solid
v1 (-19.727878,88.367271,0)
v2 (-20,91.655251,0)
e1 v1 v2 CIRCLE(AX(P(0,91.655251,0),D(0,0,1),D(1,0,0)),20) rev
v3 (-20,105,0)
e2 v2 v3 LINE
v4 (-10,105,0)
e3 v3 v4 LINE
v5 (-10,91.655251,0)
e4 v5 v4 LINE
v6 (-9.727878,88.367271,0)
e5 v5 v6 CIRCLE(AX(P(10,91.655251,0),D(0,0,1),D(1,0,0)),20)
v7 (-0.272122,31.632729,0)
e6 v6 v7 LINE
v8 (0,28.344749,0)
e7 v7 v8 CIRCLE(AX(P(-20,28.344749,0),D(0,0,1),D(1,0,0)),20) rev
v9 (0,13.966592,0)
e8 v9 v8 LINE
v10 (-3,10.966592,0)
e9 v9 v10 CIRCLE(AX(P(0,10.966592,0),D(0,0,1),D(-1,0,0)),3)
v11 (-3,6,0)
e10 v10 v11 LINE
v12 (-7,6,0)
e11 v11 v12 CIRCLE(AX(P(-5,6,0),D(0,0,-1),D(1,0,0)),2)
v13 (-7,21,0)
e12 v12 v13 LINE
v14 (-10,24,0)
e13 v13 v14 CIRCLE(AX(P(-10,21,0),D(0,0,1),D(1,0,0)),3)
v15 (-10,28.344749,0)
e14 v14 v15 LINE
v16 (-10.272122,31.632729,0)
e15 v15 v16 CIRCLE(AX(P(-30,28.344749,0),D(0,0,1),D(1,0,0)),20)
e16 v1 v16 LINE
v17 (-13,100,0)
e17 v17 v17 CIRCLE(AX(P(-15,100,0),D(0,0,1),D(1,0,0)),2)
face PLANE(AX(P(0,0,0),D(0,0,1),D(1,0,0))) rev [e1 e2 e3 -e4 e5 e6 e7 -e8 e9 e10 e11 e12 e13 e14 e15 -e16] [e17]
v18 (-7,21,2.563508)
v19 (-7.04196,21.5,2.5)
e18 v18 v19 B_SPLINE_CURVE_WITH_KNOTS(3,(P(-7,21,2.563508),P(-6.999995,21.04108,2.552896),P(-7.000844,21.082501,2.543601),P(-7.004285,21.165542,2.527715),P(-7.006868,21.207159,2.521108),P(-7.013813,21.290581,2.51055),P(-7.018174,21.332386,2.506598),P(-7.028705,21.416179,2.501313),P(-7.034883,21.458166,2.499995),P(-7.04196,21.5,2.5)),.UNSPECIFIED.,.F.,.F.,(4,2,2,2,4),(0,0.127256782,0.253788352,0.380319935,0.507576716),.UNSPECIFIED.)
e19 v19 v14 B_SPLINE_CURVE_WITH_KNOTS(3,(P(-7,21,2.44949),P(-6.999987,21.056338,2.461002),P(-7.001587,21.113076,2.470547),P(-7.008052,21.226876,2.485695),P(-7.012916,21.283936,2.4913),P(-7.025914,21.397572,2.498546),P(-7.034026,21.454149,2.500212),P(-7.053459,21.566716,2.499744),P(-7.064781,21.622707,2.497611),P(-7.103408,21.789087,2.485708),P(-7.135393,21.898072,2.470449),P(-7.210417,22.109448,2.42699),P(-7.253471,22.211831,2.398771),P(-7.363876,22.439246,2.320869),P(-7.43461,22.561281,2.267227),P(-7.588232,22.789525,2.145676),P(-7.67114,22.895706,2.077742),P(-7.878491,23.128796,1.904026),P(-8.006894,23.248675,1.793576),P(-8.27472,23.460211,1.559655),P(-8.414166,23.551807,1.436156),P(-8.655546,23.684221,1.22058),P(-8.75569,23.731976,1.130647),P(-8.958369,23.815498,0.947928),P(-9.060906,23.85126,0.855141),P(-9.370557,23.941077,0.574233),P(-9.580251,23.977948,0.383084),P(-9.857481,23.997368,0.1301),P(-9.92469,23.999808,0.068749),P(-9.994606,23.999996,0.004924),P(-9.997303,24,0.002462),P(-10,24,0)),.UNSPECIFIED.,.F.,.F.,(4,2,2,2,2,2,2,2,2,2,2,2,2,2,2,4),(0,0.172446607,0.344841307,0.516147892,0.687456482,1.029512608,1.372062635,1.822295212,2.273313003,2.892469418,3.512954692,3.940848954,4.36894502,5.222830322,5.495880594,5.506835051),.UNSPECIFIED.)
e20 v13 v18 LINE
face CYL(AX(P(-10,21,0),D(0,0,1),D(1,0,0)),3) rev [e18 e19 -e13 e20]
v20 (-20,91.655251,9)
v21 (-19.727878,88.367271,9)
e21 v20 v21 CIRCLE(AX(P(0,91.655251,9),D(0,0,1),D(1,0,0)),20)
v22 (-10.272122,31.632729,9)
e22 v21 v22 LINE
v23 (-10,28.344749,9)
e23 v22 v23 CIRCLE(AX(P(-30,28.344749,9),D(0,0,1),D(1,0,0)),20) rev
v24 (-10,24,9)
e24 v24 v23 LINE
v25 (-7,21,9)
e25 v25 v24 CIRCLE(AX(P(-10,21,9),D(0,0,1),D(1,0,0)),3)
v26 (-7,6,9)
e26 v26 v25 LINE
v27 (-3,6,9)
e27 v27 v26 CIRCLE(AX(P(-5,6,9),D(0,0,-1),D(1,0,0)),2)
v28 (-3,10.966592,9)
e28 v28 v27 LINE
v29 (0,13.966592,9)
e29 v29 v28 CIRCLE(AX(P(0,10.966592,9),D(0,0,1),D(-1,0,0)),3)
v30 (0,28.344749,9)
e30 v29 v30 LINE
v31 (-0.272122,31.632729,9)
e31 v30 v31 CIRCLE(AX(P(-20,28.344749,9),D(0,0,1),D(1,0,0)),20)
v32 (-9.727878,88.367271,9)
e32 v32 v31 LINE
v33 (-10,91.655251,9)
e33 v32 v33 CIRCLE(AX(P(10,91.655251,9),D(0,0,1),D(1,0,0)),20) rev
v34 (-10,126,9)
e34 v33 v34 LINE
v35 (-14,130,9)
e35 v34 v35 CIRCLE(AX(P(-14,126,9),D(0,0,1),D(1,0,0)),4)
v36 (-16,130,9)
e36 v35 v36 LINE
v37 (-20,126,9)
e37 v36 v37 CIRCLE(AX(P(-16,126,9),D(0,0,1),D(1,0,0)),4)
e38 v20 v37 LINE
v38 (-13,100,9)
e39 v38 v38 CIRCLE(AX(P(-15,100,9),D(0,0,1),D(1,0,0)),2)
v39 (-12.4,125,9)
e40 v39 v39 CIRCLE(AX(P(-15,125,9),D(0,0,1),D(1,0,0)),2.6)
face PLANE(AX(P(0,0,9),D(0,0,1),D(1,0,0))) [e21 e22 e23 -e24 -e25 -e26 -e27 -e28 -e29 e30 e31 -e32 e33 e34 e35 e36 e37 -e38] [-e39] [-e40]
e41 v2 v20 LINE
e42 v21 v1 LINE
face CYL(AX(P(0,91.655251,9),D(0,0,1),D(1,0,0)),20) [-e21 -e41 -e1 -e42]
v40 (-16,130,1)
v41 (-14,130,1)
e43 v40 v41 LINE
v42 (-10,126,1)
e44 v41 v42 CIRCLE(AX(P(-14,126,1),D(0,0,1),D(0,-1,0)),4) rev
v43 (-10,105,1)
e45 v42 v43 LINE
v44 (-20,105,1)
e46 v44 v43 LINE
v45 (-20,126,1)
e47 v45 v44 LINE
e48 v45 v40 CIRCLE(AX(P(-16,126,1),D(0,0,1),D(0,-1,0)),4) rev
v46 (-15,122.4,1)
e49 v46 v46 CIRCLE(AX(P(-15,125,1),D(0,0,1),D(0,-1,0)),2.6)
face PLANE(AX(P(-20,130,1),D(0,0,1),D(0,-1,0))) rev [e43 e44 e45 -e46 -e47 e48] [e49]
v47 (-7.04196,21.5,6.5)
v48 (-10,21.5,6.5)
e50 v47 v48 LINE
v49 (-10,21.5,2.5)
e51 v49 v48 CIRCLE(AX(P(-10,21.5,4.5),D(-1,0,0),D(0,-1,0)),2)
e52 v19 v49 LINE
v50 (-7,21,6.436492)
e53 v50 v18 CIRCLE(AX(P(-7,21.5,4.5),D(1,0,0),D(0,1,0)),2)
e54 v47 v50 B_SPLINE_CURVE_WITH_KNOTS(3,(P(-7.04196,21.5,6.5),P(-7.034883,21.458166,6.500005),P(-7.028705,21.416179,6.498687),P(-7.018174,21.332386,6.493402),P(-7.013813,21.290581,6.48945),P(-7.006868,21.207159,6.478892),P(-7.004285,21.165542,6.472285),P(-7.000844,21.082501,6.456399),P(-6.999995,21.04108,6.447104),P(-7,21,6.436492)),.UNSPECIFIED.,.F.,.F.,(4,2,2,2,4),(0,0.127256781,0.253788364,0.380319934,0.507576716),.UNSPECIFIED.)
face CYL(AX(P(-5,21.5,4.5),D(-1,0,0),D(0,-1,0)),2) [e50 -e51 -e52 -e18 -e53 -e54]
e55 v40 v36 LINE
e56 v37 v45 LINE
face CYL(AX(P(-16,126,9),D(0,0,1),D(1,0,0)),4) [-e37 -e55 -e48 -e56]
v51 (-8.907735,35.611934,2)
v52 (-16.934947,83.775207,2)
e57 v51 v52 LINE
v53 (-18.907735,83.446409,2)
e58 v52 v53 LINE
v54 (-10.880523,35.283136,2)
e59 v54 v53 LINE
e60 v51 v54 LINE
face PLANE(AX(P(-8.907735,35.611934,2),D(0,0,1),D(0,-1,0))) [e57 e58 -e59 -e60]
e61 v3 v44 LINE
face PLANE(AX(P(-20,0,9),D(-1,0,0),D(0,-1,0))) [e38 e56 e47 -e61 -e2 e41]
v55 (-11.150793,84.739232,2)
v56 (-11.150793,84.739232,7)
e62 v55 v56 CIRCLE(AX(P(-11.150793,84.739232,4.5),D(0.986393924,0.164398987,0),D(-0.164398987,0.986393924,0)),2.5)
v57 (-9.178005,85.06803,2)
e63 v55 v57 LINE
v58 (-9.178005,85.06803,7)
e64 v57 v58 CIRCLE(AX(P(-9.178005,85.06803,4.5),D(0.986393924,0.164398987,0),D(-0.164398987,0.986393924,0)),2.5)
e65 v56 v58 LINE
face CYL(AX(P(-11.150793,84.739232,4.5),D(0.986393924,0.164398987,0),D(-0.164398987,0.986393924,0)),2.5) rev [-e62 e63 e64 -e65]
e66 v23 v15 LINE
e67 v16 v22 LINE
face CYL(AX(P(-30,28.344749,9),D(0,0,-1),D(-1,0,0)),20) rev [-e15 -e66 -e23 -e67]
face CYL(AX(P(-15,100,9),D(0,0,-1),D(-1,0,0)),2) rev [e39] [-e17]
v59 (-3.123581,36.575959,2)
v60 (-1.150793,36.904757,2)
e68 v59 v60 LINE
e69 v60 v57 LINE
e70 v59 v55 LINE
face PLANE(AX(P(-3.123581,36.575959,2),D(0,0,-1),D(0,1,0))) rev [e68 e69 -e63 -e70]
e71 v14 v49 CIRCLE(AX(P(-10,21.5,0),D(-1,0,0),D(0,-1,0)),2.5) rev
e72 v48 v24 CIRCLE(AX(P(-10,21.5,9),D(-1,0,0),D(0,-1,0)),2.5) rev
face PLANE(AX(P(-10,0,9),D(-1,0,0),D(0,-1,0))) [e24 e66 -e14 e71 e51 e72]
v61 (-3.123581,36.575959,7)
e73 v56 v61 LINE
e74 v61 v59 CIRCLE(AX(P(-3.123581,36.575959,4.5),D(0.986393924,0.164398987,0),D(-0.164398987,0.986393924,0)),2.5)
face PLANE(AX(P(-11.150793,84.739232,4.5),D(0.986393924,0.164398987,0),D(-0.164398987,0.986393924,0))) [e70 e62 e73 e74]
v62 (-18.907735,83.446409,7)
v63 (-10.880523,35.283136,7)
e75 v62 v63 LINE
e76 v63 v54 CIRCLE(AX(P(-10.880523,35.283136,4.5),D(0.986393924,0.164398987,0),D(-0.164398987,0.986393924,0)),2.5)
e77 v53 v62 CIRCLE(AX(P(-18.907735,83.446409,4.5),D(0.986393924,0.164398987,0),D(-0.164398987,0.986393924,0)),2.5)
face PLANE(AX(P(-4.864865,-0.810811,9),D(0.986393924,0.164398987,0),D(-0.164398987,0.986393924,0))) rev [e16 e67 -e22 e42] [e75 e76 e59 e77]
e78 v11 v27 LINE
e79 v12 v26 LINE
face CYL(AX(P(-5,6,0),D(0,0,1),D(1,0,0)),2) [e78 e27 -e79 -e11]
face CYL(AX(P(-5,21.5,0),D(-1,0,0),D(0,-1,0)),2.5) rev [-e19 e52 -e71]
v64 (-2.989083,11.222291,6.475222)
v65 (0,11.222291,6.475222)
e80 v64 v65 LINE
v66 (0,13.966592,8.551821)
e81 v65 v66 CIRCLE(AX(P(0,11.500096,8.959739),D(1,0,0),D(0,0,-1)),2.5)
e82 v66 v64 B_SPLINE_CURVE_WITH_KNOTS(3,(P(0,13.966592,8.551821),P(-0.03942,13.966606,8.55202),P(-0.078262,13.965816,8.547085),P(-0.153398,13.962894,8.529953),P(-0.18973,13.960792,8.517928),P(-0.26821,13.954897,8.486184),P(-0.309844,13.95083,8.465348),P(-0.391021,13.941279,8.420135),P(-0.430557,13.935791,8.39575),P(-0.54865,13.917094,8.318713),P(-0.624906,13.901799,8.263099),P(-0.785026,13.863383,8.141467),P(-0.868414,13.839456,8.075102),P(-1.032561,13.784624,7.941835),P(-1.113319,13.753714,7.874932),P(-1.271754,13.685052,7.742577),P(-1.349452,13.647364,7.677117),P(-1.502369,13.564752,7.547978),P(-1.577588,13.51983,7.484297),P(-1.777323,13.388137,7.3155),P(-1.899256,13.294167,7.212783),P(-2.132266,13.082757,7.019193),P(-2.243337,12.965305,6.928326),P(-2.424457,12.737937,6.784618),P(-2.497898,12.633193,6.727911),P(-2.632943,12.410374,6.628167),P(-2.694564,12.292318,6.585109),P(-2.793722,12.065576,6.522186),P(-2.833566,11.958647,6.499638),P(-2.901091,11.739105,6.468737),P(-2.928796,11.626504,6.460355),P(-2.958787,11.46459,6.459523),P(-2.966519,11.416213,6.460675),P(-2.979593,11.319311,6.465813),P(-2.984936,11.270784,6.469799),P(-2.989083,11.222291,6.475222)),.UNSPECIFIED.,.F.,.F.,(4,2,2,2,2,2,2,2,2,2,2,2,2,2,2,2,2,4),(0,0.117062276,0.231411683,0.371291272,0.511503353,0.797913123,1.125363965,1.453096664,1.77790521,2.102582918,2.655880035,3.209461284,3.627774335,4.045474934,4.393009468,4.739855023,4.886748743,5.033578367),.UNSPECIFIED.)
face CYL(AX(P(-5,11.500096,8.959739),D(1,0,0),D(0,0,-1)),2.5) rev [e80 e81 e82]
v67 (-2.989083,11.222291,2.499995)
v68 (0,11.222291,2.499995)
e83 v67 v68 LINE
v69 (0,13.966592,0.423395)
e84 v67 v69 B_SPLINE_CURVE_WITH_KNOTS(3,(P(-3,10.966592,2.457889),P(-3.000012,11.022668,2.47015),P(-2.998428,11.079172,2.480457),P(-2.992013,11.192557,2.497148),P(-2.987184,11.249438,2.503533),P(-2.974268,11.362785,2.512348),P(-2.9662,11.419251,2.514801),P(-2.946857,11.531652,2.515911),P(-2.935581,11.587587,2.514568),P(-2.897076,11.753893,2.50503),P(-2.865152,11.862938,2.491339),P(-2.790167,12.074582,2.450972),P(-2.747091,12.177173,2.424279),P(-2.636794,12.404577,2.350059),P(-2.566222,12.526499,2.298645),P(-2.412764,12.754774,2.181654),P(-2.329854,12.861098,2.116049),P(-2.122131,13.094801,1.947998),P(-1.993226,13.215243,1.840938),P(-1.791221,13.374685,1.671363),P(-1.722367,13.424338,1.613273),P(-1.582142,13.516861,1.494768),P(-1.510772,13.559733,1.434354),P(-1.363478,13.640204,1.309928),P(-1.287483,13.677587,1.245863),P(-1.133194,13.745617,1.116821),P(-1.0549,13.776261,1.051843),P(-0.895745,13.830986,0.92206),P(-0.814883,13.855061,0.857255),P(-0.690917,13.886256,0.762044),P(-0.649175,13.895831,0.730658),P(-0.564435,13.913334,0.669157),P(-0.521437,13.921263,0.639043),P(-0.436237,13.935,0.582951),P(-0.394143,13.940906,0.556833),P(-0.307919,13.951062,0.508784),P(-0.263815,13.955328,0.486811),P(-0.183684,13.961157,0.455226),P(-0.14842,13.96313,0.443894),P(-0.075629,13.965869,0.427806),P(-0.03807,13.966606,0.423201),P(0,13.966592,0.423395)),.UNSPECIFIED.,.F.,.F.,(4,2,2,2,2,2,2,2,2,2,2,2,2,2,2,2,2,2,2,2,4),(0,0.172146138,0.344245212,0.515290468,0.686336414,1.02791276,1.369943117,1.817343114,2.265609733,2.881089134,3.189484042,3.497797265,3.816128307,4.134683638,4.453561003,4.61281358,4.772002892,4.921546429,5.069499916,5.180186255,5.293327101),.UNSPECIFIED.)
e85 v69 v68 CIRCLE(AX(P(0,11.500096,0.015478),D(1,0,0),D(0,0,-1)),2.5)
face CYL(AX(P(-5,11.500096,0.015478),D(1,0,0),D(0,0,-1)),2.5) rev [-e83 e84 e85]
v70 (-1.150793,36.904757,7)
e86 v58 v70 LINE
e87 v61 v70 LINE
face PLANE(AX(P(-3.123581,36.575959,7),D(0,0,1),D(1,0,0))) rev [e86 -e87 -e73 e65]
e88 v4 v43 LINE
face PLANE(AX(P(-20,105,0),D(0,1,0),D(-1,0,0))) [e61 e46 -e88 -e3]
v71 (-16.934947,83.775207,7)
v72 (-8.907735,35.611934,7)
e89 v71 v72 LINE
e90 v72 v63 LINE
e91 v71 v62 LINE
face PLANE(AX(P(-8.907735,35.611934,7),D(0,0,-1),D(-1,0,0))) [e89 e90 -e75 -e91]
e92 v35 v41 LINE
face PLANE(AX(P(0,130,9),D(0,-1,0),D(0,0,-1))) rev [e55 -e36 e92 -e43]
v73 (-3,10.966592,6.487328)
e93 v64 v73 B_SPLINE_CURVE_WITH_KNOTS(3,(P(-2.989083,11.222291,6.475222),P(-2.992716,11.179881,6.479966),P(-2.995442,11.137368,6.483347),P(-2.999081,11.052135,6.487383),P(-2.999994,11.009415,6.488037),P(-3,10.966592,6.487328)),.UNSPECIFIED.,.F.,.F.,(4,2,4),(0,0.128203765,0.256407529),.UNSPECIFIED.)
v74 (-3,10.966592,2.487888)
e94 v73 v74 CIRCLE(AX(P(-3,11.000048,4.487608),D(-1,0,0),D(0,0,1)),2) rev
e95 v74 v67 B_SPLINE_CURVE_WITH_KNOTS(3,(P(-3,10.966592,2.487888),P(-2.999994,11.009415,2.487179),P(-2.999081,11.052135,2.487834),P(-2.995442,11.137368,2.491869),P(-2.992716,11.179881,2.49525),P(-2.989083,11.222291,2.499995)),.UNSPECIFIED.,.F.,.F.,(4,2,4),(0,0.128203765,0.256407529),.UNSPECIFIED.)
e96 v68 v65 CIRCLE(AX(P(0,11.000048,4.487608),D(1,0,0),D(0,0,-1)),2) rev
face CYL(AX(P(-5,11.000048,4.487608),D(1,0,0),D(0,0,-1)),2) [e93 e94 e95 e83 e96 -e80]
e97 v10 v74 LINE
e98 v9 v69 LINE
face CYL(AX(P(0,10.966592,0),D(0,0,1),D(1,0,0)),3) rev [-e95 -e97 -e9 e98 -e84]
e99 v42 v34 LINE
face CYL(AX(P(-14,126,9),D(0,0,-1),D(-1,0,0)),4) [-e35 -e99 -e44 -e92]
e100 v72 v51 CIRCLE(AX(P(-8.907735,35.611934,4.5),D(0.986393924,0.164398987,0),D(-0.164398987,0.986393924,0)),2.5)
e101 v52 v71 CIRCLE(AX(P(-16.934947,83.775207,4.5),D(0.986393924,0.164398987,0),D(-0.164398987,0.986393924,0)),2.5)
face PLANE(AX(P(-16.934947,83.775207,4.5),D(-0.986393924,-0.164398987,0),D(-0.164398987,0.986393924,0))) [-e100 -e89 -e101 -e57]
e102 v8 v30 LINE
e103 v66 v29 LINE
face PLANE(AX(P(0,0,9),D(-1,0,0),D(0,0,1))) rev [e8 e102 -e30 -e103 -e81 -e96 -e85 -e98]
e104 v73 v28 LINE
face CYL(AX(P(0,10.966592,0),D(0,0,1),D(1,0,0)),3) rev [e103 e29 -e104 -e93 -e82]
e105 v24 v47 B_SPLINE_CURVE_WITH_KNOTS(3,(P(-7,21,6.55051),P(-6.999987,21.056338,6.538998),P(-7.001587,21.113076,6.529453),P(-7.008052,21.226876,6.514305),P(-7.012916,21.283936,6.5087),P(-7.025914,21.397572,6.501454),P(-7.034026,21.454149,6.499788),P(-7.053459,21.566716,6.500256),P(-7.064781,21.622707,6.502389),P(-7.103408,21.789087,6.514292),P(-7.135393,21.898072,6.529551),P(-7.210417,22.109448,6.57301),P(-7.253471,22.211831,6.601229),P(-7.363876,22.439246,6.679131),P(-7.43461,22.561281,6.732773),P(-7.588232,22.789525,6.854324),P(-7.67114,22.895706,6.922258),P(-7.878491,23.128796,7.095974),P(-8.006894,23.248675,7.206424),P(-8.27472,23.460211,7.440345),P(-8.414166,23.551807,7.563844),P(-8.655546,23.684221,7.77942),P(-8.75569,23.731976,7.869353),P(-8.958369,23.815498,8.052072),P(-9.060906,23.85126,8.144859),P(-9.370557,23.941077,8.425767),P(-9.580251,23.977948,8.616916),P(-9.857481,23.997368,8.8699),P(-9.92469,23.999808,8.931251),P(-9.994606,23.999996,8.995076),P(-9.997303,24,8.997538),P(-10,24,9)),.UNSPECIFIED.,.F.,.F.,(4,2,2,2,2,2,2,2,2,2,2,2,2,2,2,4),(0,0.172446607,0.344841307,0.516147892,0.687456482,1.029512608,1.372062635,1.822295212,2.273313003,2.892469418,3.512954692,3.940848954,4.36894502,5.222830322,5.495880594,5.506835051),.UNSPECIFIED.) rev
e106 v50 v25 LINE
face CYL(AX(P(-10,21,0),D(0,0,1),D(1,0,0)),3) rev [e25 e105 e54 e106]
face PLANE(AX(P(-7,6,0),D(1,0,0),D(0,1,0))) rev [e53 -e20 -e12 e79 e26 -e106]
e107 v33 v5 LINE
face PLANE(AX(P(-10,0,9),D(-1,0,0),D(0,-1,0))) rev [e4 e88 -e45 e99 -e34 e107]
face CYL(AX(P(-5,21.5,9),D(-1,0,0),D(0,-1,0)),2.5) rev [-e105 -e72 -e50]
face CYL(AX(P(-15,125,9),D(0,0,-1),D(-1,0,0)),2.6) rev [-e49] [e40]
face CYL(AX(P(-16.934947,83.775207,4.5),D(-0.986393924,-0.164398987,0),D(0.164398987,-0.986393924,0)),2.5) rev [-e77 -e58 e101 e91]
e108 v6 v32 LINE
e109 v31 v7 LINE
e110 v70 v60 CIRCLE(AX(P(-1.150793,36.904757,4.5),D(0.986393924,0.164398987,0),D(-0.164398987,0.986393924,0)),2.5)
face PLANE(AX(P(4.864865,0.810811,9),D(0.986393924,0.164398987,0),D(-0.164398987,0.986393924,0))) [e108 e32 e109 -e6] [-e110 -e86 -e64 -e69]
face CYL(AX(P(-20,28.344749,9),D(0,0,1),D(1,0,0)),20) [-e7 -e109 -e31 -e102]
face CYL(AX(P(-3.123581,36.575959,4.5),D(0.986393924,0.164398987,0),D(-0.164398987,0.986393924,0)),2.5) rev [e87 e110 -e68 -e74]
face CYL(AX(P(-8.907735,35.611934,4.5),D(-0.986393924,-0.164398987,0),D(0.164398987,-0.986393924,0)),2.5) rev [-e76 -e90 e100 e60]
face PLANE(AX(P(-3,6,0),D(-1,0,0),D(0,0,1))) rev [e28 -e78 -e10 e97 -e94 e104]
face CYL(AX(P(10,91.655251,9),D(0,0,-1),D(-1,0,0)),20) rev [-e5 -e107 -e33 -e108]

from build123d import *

# Parameters (mm, degrees)
SKETCH1_R           = 2
SKETCH1_R_2         = 2.6
BOSS_EXTRUDE1_DEPTH = 9
FILLET1_R           = 4
SKETCH3_W           = 1
SKETCH3_H           = 25
CUT_EXTRUDE2_DEPTH  = 131.694299799
CUT_EXTRUDE3_DEPTH  = 132.837020597
BOSS_EXTRUDE2_DEPTH = 3
BOSS_EXTRUDE4_DEPTH = 5
CUT_EXTRUDE4_DEPTH  = 2
FILLET2_R           = 20
FILLET3_R           = 4


with BuildPart() as part:
    # Sketch1 → Boss-Extrude1 (new body)
    with BuildSketch(Plane.XY):
        Polygon((0, 0), (-10, 0), (-10, 30), (-20, 90), (-20, 130), (-10, 130), (-10, 90), (0, 30), align=None)
        with Locations((-15, 100)):
            Circle(SKETCH1_R, mode=Mode.SUBTRACT)
        with Locations((-15, 125)):
            Circle(SKETCH1_R_2, mode=Mode.SUBTRACT)
    extrude(amount=BOSS_EXTRUDE1_DEPTH)

    # Fillet1
    fillet1_edges = [part.edges().sort_by_distance(p)[0] for p in [
        (0, 0, 4.5),
        (-10, 0, 4.5),
    ]]
    fillet(fillet1_edges, radius=FILLET1_R)

    # Sketch3 → Cut-Extrude2 (cut, through all)
    with BuildSketch(Plane.ZY.offset(10)):
        with Locations((0.5, 117.5)):
            Rectangle(SKETCH3_W, SKETCH3_H)
    extrude(amount=CUT_EXTRUDE2_DEPTH, mode=Mode.SUBTRACT)

    # Sketch5 → Cut-Extrude3 (cut, through all)
    with BuildSketch(Plane.XY.offset(9)):
        with BuildLine():
            Line((-10, 4), (-10, 24))
            ThreePointArc((-10, 24), (-7.878679656, 23.121320344), (-7, 21))
            Line((-7, 21), (-7, 6))
            ThreePointArc((-7, 6), (-5, 4), (-3, 6))
            Line((-3, 6), (-3, 10.96659189))
            ThreePointArc((-3, 10.96659189), (-2.121320344, 13.087912234), (0, 13.96659189))
            Line((0, 13.96659189), (0, 4))
            ThreePointArc((0, 4), (-1.171572875, 1.171572875), (-4, 0))
            Line((-4, 0), (-6, 0))
            ThreePointArc((-6, 0), (-8.828427125, 1.171572875), (-10, 4))
        make_face()
    extrude(amount=-CUT_EXTRUDE3_DEPTH, mode=Mode.SUBTRACT)

    # Boss-Extrude2: read off the stored shape, not the designer's step
    # Boss-Extrude2 outline → Boss-Extrude2 (add)
    with BuildSketch(Plane.ZY):
        with BuildLine():
            Line((9, 13.96659189), (9, 30))
            Line((9, 30), (0, 30))
            Line((0, 30), (0, 13.96659189))
            Line((0, 13.96659189), (0.423395215, 13.96659189))
            ThreePointArc((0.423395215, 13.96659189), (2.009052541, 13.008624555), (2.499994655, 11.222291324))
            ThreePointArc((2.499994655, 11.222291324), (4.487608253, 9.000047793), (6.47522185, 11.222291324))
            ThreePointArc((6.47522185, 11.222291324), (6.966163965, 13.008624555), (8.551821291, 13.96659189))
            Line((8.551821291, 13.96659189), (9, 13.96659189))
        make_face()
    extrude(amount=BOSS_EXTRUDE2_DEPTH)

    # Sketch8 → Boss-Extrude4 (add)
    with BuildSketch(Plane.ZY.offset(10)):
        with BuildLine():
            Line((2.5, 21.5), (6.5, 21.5))
            ThreePointArc((6.5, 21.5), (4.5, 19.5), (2.5, 21.5))
        make_face()
        with BuildLine():
            ThreePointArc((0, 24), (1.767766953, 23.267766953), (2.5, 21.5))
            Line((2.5, 21.5), (6.5, 21.5))
            ThreePointArc((6.5, 21.5), (7.232233047, 23.267766953), (9, 24))
            Line((9, 24), (0, 24))
        make_face()
    extrude(amount=-BOSS_EXTRUDE4_DEPTH)

    # Sketch9 → Cut-Extrude4 (cut)
    with BuildSketch(Plane(origin=(4.931969619, 0.408182285, 0), x_dir=(0, 0, -1), z_dir=(0.9863939238321437, 0.16439898730535749, 0))):
        with BuildLine():
            Line((-7, 37), (-7, 85.827625303))
            ThreePointArc((-7, 85.827625303), (-4.5, 88.327625303), (-2, 85.827625303))
            Line((-2, 85.827625303), (-2, 37))
            ThreePointArc((-2, 37), (-4.5, 34.5), (-7, 37))
        make_face()
    cut_extrude4 = extrude(amount=-CUT_EXTRUDE4_DEPTH, mode=Mode.SUBTRACT)

    # Mirror1: Cut-Extrude4 across plane
    add(cut_extrude4.mirror(Plane(origin=(0, 0, 0), x_dir=(0, 0, 1), z_dir=(0.9863939238321437, 0.16439898730535743, 0))), mode=Mode.SUBTRACT)

    # Fillet2
    fillet2_edges = [part.edges().sort_by_distance(p)[0] for p in [
        (-10, 30, 4.5),
        (-20, 90, 4.5),
        (-10, 90, 4.5),
        (0, 30, 4.5),
    ]]
    fillet(fillet2_edges, radius=FILLET2_R)

    # Fillet3
    fillet3_edges = [part.edges().sort_by_distance(p)[0] for p in [
        (-20, 130, 5),
        (-10, 130, 5),
    ]]
    fillet(fillet3_edges, radius=FILLET3_R)


solid = part.part
